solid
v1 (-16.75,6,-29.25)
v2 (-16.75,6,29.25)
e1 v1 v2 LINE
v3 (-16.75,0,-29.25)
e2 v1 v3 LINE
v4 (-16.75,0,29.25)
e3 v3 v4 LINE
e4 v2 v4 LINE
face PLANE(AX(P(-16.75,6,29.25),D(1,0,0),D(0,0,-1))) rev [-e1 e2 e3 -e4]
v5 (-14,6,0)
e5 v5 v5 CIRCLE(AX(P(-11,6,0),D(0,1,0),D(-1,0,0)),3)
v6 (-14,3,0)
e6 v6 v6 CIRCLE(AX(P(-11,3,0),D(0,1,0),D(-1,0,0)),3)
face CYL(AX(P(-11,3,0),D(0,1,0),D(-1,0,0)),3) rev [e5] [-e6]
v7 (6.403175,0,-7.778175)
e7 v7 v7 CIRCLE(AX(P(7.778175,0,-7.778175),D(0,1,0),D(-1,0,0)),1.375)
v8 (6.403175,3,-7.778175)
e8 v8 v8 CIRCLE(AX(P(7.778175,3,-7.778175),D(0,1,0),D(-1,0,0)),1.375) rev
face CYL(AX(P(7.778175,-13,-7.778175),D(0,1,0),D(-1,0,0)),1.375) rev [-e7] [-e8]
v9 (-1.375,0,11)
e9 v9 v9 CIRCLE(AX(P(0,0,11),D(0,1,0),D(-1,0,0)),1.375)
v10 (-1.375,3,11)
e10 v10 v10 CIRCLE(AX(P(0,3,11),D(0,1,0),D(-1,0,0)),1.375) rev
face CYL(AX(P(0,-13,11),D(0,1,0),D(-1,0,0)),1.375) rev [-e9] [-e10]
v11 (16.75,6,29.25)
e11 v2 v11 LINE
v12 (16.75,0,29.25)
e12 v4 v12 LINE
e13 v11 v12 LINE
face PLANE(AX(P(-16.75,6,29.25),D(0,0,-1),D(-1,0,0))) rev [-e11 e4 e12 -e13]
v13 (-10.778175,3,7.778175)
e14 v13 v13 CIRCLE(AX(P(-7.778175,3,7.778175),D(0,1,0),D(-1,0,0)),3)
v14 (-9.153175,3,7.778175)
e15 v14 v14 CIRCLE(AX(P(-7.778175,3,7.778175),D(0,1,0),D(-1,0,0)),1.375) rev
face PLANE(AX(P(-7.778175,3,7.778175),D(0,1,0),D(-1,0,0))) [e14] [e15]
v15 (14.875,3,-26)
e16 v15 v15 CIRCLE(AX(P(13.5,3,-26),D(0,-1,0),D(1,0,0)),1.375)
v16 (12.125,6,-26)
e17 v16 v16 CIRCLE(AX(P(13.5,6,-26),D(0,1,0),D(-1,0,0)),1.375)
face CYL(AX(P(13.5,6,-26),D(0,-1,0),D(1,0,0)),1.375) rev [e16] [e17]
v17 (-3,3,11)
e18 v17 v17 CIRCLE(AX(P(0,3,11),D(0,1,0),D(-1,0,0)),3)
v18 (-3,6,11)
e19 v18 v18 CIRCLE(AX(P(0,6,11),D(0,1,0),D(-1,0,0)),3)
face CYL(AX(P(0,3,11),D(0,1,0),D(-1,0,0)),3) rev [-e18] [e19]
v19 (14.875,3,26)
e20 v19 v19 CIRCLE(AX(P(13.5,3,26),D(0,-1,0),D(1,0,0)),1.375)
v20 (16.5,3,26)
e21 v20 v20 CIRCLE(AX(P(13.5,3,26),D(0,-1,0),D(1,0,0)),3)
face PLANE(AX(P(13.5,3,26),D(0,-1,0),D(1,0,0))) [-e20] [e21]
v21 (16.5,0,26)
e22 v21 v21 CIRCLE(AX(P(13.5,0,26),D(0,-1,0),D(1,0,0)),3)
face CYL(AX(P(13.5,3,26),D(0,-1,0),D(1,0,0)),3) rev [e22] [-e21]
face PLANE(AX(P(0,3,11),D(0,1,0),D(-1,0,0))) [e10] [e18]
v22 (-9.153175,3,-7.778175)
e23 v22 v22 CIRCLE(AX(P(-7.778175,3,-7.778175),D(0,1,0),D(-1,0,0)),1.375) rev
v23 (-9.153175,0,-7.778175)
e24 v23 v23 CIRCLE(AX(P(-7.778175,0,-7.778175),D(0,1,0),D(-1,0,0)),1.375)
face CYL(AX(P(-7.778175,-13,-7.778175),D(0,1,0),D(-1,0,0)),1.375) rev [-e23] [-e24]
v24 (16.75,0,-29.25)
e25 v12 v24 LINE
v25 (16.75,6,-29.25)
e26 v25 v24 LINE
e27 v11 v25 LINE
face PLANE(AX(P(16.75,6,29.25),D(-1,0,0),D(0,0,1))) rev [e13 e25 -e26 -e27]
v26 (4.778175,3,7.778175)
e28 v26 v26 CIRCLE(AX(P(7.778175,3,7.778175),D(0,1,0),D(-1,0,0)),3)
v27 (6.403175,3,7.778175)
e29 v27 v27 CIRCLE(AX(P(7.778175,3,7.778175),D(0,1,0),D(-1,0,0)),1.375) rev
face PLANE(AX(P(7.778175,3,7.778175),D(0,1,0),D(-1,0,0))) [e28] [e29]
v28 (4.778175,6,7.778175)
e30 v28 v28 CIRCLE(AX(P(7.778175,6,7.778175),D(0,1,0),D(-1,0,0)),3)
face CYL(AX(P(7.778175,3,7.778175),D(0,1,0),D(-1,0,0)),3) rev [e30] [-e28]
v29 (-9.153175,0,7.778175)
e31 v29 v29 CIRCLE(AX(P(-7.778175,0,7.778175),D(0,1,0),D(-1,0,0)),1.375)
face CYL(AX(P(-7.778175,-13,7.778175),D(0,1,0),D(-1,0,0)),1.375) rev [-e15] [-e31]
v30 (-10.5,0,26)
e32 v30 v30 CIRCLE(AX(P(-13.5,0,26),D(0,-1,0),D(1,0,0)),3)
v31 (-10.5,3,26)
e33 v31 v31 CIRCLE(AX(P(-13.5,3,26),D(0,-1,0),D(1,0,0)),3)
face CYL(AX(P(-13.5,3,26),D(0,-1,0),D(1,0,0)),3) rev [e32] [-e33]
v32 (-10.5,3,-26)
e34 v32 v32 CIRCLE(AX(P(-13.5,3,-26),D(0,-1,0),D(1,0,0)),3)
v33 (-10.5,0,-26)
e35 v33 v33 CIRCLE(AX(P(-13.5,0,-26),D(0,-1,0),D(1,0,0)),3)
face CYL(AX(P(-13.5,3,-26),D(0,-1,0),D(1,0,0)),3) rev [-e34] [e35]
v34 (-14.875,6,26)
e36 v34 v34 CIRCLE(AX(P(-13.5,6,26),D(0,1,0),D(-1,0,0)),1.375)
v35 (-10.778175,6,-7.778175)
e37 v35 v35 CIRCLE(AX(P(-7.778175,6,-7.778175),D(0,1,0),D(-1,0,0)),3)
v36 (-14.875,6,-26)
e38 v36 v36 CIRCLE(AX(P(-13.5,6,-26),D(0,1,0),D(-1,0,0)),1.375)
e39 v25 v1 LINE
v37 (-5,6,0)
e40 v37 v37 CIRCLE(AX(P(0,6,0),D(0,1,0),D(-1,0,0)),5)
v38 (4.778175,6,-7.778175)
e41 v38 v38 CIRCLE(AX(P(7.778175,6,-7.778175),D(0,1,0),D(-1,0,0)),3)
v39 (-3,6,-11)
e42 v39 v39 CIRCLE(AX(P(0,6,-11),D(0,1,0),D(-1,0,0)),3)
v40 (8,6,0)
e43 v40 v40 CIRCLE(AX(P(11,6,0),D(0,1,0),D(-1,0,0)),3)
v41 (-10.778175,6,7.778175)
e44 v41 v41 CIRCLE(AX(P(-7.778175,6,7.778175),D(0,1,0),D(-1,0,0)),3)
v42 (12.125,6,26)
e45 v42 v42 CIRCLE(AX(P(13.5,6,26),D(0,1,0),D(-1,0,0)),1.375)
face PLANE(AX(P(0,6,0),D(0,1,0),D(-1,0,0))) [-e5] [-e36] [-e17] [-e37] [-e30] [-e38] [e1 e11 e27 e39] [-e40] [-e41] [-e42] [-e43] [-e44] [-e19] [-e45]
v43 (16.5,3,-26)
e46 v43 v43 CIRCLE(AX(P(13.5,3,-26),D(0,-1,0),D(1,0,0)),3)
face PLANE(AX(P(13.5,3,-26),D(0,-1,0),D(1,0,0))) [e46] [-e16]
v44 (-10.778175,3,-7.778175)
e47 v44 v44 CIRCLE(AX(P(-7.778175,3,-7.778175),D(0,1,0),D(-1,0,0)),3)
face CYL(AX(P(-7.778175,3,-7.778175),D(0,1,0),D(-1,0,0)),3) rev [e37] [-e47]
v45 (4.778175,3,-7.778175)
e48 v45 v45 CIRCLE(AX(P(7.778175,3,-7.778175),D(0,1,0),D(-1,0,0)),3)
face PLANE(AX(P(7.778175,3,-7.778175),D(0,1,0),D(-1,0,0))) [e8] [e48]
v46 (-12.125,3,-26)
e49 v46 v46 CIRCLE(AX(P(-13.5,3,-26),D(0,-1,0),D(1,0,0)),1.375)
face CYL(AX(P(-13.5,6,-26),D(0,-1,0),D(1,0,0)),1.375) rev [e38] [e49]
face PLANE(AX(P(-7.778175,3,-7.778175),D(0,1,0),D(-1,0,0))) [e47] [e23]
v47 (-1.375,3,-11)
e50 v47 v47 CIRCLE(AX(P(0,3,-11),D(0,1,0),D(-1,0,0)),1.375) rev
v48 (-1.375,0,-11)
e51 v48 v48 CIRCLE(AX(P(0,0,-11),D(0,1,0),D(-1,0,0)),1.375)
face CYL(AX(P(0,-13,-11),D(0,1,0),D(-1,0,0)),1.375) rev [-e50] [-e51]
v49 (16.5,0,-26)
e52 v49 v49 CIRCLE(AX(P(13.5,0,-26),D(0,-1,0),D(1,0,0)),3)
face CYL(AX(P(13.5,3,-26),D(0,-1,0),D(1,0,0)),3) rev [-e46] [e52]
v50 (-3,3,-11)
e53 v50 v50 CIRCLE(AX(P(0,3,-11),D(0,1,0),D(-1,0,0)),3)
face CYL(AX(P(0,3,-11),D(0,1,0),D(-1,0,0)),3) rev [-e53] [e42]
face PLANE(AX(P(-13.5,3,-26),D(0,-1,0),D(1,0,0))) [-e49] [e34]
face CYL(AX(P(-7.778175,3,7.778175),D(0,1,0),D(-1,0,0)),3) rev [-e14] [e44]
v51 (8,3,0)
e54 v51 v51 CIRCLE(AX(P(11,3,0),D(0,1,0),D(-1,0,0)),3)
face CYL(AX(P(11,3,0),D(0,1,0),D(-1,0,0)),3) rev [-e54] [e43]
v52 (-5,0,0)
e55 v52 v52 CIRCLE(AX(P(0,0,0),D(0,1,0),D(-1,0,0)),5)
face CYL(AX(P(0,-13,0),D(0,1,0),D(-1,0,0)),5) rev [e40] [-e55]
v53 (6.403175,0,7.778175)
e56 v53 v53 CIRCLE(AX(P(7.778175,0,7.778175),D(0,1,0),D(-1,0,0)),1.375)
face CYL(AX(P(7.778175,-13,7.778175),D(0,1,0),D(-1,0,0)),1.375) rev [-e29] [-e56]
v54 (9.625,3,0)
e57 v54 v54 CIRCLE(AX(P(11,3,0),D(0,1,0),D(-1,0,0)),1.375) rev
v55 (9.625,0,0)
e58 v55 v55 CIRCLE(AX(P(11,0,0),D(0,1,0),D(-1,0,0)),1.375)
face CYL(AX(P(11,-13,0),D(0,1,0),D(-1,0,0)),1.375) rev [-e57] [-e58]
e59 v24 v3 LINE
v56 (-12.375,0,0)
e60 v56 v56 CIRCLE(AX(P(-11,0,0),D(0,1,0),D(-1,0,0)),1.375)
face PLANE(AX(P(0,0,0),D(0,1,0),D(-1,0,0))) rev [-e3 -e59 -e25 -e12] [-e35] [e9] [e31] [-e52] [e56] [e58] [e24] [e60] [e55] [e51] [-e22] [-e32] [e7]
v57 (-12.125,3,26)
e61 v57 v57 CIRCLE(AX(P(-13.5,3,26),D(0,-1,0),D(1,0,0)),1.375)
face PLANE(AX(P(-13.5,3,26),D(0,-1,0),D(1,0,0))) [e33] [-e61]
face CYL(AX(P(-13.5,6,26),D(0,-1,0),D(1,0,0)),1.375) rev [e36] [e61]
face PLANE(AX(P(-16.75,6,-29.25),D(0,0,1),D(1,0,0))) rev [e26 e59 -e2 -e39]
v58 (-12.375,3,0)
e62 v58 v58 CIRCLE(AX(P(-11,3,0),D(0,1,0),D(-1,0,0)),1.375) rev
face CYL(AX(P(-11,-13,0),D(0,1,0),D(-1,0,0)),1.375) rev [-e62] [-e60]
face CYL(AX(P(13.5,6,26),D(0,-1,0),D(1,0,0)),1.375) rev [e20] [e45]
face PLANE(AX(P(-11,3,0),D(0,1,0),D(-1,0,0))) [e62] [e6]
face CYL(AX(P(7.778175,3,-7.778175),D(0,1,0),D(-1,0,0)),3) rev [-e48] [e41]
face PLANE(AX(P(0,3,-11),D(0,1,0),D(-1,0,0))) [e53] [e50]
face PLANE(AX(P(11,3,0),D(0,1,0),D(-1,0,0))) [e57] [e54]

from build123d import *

# Parameters (mm, degrees)
SKETCH1_W             = 58.5
SKETCH1_H             = 33.5
SKETCH1_R             = 1.375
BOSS_EXTRUDE1_DEPTH   = 6
SKETCH2_R             = 1.375
CUT_EXTRUDE1_DEPTH    = 19
SKETCH3_R             = 5
CUT_EXTRUDE2_DEPTH    = 19
SKETCH4_R             = 3
CUT_EXTRUDE3_DEPTH    = 3
SKETCH5_R             = 3
CUT_EXTRUDE4_DEPTH    = 3
BODY_MOVE_COPY1_ANGLE = 120
BODY_MOVE_COPY2_ANGLE = 90


with BuildPart() as part:
    # Sketch1 → Boss-Extrude1 (new body)
    with BuildSketch(Plane(origin=(0, 0, 0), x_dir=(1, 0, 0), z_dir=(0, 1, 0))):
        Rectangle(SKETCH1_W, SKETCH1_H)
        with Locations((-26, 13.5)):
            Circle(SKETCH1_R, mode=Mode.SUBTRACT)
        with Locations((-26, -13.5)):
            Circle(SKETCH1_R, mode=Mode.SUBTRACT)
        with Locations((26, 13.5)):
            Circle(SKETCH1_R, mode=Mode.SUBTRACT)
        with Locations((26, -13.5)):
            Circle(SKETCH1_R, mode=Mode.SUBTRACT)
    extrude(amount=BOSS_EXTRUDE1_DEPTH)

    # Sketch2 → Cut-Extrude1 (cut)
    with BuildSketch(Plane(origin=(0, 6, 0), x_dir=(1, 0, 0), z_dir=(0, 1, 0))):
        with Locations((0, 11)):
            Circle(SKETCH2_R)
        with Locations((7.778174593, 7.778174593)):
            Circle(SKETCH2_R)
        with Locations((11, 0)):
            Circle(SKETCH2_R)
        with Locations((7.778174593, -7.778174593)):
            Circle(SKETCH2_R)
        with Locations((0, -11)):
            Circle(SKETCH2_R)
        with Locations((-7.778174593, -7.778174593)):
            Circle(SKETCH2_R)
        with Locations((-11, 0)):
            Circle(SKETCH2_R)
        with Locations((-7.778174593, 7.778174593)):
            Circle(SKETCH2_R)
    extrude(amount=-CUT_EXTRUDE1_DEPTH, mode=Mode.SUBTRACT)

    # Sketch3 → Cut-Extrude2 (cut)
    with BuildSketch(Plane(origin=(0, 6, 0), x_dir=(1, 0, 0), z_dir=(0, 1, 0))):
        Circle(SKETCH3_R)
    extrude(amount=-CUT_EXTRUDE2_DEPTH, mode=Mode.SUBTRACT)

    # Sketch4 → Cut-Extrude3 (cut)
    with BuildSketch(Plane(origin=(0, 6, 0), x_dir=(1, 0, 0), z_dir=(0, 1, 0))):
        with Locations((-7.778174593, 7.778174593)):
            Circle(SKETCH4_R)
        with Locations((0, 11)):
            Circle(SKETCH4_R)
        with Locations((7.778174593, 7.778174593)):
            Circle(SKETCH4_R)
        with Locations((11, 0)):
            Circle(SKETCH4_R)
        with Locations((7.778174593, -7.778174593)):
            Circle(SKETCH4_R)
        with Locations((0, -11)):
            Circle(SKETCH4_R)
        with Locations((-7.778174593, -7.778174593)):
            Circle(SKETCH4_R)
        with Locations((-11, 0)):
            Circle(SKETCH4_R)
    extrude(amount=-CUT_EXTRUDE3_DEPTH, mode=Mode.SUBTRACT)

    # Sketch5 → Cut-Extrude4 (cut)
    with BuildSketch(Plane.XZ):
        with Locations((-26, 13.5)):
            Circle(SKETCH5_R)
        with Locations((26, 13.5)):
            Circle(SKETCH5_R)
        with Locations((26, -13.5)):
            Circle(SKETCH5_R)
        with Locations((-26, -13.5)):
            Circle(SKETCH5_R)
    extrude(amount=-CUT_EXTRUDE4_DEPTH, mode=Mode.SUBTRACT)


with BuildPart() as part_1:
    # Body-Move/Copy1: moved
    add(part.part.moved(Location((0, 0, 0))).rotate(Axis((-1, 2, 1), (-0.5773502691896272, -0.5773502691896252, 0.5773502691896252)), BODY_MOVE_COPY1_ANGLE))


with BuildPart() as part_2:
    # Body-Move/Copy2: moved
    add(part_1.part.rotate(Axis((0, 3, 0), (1, 0, 0)), BODY_MOVE_COPY2_ANGLE))


solid = part_2.part
